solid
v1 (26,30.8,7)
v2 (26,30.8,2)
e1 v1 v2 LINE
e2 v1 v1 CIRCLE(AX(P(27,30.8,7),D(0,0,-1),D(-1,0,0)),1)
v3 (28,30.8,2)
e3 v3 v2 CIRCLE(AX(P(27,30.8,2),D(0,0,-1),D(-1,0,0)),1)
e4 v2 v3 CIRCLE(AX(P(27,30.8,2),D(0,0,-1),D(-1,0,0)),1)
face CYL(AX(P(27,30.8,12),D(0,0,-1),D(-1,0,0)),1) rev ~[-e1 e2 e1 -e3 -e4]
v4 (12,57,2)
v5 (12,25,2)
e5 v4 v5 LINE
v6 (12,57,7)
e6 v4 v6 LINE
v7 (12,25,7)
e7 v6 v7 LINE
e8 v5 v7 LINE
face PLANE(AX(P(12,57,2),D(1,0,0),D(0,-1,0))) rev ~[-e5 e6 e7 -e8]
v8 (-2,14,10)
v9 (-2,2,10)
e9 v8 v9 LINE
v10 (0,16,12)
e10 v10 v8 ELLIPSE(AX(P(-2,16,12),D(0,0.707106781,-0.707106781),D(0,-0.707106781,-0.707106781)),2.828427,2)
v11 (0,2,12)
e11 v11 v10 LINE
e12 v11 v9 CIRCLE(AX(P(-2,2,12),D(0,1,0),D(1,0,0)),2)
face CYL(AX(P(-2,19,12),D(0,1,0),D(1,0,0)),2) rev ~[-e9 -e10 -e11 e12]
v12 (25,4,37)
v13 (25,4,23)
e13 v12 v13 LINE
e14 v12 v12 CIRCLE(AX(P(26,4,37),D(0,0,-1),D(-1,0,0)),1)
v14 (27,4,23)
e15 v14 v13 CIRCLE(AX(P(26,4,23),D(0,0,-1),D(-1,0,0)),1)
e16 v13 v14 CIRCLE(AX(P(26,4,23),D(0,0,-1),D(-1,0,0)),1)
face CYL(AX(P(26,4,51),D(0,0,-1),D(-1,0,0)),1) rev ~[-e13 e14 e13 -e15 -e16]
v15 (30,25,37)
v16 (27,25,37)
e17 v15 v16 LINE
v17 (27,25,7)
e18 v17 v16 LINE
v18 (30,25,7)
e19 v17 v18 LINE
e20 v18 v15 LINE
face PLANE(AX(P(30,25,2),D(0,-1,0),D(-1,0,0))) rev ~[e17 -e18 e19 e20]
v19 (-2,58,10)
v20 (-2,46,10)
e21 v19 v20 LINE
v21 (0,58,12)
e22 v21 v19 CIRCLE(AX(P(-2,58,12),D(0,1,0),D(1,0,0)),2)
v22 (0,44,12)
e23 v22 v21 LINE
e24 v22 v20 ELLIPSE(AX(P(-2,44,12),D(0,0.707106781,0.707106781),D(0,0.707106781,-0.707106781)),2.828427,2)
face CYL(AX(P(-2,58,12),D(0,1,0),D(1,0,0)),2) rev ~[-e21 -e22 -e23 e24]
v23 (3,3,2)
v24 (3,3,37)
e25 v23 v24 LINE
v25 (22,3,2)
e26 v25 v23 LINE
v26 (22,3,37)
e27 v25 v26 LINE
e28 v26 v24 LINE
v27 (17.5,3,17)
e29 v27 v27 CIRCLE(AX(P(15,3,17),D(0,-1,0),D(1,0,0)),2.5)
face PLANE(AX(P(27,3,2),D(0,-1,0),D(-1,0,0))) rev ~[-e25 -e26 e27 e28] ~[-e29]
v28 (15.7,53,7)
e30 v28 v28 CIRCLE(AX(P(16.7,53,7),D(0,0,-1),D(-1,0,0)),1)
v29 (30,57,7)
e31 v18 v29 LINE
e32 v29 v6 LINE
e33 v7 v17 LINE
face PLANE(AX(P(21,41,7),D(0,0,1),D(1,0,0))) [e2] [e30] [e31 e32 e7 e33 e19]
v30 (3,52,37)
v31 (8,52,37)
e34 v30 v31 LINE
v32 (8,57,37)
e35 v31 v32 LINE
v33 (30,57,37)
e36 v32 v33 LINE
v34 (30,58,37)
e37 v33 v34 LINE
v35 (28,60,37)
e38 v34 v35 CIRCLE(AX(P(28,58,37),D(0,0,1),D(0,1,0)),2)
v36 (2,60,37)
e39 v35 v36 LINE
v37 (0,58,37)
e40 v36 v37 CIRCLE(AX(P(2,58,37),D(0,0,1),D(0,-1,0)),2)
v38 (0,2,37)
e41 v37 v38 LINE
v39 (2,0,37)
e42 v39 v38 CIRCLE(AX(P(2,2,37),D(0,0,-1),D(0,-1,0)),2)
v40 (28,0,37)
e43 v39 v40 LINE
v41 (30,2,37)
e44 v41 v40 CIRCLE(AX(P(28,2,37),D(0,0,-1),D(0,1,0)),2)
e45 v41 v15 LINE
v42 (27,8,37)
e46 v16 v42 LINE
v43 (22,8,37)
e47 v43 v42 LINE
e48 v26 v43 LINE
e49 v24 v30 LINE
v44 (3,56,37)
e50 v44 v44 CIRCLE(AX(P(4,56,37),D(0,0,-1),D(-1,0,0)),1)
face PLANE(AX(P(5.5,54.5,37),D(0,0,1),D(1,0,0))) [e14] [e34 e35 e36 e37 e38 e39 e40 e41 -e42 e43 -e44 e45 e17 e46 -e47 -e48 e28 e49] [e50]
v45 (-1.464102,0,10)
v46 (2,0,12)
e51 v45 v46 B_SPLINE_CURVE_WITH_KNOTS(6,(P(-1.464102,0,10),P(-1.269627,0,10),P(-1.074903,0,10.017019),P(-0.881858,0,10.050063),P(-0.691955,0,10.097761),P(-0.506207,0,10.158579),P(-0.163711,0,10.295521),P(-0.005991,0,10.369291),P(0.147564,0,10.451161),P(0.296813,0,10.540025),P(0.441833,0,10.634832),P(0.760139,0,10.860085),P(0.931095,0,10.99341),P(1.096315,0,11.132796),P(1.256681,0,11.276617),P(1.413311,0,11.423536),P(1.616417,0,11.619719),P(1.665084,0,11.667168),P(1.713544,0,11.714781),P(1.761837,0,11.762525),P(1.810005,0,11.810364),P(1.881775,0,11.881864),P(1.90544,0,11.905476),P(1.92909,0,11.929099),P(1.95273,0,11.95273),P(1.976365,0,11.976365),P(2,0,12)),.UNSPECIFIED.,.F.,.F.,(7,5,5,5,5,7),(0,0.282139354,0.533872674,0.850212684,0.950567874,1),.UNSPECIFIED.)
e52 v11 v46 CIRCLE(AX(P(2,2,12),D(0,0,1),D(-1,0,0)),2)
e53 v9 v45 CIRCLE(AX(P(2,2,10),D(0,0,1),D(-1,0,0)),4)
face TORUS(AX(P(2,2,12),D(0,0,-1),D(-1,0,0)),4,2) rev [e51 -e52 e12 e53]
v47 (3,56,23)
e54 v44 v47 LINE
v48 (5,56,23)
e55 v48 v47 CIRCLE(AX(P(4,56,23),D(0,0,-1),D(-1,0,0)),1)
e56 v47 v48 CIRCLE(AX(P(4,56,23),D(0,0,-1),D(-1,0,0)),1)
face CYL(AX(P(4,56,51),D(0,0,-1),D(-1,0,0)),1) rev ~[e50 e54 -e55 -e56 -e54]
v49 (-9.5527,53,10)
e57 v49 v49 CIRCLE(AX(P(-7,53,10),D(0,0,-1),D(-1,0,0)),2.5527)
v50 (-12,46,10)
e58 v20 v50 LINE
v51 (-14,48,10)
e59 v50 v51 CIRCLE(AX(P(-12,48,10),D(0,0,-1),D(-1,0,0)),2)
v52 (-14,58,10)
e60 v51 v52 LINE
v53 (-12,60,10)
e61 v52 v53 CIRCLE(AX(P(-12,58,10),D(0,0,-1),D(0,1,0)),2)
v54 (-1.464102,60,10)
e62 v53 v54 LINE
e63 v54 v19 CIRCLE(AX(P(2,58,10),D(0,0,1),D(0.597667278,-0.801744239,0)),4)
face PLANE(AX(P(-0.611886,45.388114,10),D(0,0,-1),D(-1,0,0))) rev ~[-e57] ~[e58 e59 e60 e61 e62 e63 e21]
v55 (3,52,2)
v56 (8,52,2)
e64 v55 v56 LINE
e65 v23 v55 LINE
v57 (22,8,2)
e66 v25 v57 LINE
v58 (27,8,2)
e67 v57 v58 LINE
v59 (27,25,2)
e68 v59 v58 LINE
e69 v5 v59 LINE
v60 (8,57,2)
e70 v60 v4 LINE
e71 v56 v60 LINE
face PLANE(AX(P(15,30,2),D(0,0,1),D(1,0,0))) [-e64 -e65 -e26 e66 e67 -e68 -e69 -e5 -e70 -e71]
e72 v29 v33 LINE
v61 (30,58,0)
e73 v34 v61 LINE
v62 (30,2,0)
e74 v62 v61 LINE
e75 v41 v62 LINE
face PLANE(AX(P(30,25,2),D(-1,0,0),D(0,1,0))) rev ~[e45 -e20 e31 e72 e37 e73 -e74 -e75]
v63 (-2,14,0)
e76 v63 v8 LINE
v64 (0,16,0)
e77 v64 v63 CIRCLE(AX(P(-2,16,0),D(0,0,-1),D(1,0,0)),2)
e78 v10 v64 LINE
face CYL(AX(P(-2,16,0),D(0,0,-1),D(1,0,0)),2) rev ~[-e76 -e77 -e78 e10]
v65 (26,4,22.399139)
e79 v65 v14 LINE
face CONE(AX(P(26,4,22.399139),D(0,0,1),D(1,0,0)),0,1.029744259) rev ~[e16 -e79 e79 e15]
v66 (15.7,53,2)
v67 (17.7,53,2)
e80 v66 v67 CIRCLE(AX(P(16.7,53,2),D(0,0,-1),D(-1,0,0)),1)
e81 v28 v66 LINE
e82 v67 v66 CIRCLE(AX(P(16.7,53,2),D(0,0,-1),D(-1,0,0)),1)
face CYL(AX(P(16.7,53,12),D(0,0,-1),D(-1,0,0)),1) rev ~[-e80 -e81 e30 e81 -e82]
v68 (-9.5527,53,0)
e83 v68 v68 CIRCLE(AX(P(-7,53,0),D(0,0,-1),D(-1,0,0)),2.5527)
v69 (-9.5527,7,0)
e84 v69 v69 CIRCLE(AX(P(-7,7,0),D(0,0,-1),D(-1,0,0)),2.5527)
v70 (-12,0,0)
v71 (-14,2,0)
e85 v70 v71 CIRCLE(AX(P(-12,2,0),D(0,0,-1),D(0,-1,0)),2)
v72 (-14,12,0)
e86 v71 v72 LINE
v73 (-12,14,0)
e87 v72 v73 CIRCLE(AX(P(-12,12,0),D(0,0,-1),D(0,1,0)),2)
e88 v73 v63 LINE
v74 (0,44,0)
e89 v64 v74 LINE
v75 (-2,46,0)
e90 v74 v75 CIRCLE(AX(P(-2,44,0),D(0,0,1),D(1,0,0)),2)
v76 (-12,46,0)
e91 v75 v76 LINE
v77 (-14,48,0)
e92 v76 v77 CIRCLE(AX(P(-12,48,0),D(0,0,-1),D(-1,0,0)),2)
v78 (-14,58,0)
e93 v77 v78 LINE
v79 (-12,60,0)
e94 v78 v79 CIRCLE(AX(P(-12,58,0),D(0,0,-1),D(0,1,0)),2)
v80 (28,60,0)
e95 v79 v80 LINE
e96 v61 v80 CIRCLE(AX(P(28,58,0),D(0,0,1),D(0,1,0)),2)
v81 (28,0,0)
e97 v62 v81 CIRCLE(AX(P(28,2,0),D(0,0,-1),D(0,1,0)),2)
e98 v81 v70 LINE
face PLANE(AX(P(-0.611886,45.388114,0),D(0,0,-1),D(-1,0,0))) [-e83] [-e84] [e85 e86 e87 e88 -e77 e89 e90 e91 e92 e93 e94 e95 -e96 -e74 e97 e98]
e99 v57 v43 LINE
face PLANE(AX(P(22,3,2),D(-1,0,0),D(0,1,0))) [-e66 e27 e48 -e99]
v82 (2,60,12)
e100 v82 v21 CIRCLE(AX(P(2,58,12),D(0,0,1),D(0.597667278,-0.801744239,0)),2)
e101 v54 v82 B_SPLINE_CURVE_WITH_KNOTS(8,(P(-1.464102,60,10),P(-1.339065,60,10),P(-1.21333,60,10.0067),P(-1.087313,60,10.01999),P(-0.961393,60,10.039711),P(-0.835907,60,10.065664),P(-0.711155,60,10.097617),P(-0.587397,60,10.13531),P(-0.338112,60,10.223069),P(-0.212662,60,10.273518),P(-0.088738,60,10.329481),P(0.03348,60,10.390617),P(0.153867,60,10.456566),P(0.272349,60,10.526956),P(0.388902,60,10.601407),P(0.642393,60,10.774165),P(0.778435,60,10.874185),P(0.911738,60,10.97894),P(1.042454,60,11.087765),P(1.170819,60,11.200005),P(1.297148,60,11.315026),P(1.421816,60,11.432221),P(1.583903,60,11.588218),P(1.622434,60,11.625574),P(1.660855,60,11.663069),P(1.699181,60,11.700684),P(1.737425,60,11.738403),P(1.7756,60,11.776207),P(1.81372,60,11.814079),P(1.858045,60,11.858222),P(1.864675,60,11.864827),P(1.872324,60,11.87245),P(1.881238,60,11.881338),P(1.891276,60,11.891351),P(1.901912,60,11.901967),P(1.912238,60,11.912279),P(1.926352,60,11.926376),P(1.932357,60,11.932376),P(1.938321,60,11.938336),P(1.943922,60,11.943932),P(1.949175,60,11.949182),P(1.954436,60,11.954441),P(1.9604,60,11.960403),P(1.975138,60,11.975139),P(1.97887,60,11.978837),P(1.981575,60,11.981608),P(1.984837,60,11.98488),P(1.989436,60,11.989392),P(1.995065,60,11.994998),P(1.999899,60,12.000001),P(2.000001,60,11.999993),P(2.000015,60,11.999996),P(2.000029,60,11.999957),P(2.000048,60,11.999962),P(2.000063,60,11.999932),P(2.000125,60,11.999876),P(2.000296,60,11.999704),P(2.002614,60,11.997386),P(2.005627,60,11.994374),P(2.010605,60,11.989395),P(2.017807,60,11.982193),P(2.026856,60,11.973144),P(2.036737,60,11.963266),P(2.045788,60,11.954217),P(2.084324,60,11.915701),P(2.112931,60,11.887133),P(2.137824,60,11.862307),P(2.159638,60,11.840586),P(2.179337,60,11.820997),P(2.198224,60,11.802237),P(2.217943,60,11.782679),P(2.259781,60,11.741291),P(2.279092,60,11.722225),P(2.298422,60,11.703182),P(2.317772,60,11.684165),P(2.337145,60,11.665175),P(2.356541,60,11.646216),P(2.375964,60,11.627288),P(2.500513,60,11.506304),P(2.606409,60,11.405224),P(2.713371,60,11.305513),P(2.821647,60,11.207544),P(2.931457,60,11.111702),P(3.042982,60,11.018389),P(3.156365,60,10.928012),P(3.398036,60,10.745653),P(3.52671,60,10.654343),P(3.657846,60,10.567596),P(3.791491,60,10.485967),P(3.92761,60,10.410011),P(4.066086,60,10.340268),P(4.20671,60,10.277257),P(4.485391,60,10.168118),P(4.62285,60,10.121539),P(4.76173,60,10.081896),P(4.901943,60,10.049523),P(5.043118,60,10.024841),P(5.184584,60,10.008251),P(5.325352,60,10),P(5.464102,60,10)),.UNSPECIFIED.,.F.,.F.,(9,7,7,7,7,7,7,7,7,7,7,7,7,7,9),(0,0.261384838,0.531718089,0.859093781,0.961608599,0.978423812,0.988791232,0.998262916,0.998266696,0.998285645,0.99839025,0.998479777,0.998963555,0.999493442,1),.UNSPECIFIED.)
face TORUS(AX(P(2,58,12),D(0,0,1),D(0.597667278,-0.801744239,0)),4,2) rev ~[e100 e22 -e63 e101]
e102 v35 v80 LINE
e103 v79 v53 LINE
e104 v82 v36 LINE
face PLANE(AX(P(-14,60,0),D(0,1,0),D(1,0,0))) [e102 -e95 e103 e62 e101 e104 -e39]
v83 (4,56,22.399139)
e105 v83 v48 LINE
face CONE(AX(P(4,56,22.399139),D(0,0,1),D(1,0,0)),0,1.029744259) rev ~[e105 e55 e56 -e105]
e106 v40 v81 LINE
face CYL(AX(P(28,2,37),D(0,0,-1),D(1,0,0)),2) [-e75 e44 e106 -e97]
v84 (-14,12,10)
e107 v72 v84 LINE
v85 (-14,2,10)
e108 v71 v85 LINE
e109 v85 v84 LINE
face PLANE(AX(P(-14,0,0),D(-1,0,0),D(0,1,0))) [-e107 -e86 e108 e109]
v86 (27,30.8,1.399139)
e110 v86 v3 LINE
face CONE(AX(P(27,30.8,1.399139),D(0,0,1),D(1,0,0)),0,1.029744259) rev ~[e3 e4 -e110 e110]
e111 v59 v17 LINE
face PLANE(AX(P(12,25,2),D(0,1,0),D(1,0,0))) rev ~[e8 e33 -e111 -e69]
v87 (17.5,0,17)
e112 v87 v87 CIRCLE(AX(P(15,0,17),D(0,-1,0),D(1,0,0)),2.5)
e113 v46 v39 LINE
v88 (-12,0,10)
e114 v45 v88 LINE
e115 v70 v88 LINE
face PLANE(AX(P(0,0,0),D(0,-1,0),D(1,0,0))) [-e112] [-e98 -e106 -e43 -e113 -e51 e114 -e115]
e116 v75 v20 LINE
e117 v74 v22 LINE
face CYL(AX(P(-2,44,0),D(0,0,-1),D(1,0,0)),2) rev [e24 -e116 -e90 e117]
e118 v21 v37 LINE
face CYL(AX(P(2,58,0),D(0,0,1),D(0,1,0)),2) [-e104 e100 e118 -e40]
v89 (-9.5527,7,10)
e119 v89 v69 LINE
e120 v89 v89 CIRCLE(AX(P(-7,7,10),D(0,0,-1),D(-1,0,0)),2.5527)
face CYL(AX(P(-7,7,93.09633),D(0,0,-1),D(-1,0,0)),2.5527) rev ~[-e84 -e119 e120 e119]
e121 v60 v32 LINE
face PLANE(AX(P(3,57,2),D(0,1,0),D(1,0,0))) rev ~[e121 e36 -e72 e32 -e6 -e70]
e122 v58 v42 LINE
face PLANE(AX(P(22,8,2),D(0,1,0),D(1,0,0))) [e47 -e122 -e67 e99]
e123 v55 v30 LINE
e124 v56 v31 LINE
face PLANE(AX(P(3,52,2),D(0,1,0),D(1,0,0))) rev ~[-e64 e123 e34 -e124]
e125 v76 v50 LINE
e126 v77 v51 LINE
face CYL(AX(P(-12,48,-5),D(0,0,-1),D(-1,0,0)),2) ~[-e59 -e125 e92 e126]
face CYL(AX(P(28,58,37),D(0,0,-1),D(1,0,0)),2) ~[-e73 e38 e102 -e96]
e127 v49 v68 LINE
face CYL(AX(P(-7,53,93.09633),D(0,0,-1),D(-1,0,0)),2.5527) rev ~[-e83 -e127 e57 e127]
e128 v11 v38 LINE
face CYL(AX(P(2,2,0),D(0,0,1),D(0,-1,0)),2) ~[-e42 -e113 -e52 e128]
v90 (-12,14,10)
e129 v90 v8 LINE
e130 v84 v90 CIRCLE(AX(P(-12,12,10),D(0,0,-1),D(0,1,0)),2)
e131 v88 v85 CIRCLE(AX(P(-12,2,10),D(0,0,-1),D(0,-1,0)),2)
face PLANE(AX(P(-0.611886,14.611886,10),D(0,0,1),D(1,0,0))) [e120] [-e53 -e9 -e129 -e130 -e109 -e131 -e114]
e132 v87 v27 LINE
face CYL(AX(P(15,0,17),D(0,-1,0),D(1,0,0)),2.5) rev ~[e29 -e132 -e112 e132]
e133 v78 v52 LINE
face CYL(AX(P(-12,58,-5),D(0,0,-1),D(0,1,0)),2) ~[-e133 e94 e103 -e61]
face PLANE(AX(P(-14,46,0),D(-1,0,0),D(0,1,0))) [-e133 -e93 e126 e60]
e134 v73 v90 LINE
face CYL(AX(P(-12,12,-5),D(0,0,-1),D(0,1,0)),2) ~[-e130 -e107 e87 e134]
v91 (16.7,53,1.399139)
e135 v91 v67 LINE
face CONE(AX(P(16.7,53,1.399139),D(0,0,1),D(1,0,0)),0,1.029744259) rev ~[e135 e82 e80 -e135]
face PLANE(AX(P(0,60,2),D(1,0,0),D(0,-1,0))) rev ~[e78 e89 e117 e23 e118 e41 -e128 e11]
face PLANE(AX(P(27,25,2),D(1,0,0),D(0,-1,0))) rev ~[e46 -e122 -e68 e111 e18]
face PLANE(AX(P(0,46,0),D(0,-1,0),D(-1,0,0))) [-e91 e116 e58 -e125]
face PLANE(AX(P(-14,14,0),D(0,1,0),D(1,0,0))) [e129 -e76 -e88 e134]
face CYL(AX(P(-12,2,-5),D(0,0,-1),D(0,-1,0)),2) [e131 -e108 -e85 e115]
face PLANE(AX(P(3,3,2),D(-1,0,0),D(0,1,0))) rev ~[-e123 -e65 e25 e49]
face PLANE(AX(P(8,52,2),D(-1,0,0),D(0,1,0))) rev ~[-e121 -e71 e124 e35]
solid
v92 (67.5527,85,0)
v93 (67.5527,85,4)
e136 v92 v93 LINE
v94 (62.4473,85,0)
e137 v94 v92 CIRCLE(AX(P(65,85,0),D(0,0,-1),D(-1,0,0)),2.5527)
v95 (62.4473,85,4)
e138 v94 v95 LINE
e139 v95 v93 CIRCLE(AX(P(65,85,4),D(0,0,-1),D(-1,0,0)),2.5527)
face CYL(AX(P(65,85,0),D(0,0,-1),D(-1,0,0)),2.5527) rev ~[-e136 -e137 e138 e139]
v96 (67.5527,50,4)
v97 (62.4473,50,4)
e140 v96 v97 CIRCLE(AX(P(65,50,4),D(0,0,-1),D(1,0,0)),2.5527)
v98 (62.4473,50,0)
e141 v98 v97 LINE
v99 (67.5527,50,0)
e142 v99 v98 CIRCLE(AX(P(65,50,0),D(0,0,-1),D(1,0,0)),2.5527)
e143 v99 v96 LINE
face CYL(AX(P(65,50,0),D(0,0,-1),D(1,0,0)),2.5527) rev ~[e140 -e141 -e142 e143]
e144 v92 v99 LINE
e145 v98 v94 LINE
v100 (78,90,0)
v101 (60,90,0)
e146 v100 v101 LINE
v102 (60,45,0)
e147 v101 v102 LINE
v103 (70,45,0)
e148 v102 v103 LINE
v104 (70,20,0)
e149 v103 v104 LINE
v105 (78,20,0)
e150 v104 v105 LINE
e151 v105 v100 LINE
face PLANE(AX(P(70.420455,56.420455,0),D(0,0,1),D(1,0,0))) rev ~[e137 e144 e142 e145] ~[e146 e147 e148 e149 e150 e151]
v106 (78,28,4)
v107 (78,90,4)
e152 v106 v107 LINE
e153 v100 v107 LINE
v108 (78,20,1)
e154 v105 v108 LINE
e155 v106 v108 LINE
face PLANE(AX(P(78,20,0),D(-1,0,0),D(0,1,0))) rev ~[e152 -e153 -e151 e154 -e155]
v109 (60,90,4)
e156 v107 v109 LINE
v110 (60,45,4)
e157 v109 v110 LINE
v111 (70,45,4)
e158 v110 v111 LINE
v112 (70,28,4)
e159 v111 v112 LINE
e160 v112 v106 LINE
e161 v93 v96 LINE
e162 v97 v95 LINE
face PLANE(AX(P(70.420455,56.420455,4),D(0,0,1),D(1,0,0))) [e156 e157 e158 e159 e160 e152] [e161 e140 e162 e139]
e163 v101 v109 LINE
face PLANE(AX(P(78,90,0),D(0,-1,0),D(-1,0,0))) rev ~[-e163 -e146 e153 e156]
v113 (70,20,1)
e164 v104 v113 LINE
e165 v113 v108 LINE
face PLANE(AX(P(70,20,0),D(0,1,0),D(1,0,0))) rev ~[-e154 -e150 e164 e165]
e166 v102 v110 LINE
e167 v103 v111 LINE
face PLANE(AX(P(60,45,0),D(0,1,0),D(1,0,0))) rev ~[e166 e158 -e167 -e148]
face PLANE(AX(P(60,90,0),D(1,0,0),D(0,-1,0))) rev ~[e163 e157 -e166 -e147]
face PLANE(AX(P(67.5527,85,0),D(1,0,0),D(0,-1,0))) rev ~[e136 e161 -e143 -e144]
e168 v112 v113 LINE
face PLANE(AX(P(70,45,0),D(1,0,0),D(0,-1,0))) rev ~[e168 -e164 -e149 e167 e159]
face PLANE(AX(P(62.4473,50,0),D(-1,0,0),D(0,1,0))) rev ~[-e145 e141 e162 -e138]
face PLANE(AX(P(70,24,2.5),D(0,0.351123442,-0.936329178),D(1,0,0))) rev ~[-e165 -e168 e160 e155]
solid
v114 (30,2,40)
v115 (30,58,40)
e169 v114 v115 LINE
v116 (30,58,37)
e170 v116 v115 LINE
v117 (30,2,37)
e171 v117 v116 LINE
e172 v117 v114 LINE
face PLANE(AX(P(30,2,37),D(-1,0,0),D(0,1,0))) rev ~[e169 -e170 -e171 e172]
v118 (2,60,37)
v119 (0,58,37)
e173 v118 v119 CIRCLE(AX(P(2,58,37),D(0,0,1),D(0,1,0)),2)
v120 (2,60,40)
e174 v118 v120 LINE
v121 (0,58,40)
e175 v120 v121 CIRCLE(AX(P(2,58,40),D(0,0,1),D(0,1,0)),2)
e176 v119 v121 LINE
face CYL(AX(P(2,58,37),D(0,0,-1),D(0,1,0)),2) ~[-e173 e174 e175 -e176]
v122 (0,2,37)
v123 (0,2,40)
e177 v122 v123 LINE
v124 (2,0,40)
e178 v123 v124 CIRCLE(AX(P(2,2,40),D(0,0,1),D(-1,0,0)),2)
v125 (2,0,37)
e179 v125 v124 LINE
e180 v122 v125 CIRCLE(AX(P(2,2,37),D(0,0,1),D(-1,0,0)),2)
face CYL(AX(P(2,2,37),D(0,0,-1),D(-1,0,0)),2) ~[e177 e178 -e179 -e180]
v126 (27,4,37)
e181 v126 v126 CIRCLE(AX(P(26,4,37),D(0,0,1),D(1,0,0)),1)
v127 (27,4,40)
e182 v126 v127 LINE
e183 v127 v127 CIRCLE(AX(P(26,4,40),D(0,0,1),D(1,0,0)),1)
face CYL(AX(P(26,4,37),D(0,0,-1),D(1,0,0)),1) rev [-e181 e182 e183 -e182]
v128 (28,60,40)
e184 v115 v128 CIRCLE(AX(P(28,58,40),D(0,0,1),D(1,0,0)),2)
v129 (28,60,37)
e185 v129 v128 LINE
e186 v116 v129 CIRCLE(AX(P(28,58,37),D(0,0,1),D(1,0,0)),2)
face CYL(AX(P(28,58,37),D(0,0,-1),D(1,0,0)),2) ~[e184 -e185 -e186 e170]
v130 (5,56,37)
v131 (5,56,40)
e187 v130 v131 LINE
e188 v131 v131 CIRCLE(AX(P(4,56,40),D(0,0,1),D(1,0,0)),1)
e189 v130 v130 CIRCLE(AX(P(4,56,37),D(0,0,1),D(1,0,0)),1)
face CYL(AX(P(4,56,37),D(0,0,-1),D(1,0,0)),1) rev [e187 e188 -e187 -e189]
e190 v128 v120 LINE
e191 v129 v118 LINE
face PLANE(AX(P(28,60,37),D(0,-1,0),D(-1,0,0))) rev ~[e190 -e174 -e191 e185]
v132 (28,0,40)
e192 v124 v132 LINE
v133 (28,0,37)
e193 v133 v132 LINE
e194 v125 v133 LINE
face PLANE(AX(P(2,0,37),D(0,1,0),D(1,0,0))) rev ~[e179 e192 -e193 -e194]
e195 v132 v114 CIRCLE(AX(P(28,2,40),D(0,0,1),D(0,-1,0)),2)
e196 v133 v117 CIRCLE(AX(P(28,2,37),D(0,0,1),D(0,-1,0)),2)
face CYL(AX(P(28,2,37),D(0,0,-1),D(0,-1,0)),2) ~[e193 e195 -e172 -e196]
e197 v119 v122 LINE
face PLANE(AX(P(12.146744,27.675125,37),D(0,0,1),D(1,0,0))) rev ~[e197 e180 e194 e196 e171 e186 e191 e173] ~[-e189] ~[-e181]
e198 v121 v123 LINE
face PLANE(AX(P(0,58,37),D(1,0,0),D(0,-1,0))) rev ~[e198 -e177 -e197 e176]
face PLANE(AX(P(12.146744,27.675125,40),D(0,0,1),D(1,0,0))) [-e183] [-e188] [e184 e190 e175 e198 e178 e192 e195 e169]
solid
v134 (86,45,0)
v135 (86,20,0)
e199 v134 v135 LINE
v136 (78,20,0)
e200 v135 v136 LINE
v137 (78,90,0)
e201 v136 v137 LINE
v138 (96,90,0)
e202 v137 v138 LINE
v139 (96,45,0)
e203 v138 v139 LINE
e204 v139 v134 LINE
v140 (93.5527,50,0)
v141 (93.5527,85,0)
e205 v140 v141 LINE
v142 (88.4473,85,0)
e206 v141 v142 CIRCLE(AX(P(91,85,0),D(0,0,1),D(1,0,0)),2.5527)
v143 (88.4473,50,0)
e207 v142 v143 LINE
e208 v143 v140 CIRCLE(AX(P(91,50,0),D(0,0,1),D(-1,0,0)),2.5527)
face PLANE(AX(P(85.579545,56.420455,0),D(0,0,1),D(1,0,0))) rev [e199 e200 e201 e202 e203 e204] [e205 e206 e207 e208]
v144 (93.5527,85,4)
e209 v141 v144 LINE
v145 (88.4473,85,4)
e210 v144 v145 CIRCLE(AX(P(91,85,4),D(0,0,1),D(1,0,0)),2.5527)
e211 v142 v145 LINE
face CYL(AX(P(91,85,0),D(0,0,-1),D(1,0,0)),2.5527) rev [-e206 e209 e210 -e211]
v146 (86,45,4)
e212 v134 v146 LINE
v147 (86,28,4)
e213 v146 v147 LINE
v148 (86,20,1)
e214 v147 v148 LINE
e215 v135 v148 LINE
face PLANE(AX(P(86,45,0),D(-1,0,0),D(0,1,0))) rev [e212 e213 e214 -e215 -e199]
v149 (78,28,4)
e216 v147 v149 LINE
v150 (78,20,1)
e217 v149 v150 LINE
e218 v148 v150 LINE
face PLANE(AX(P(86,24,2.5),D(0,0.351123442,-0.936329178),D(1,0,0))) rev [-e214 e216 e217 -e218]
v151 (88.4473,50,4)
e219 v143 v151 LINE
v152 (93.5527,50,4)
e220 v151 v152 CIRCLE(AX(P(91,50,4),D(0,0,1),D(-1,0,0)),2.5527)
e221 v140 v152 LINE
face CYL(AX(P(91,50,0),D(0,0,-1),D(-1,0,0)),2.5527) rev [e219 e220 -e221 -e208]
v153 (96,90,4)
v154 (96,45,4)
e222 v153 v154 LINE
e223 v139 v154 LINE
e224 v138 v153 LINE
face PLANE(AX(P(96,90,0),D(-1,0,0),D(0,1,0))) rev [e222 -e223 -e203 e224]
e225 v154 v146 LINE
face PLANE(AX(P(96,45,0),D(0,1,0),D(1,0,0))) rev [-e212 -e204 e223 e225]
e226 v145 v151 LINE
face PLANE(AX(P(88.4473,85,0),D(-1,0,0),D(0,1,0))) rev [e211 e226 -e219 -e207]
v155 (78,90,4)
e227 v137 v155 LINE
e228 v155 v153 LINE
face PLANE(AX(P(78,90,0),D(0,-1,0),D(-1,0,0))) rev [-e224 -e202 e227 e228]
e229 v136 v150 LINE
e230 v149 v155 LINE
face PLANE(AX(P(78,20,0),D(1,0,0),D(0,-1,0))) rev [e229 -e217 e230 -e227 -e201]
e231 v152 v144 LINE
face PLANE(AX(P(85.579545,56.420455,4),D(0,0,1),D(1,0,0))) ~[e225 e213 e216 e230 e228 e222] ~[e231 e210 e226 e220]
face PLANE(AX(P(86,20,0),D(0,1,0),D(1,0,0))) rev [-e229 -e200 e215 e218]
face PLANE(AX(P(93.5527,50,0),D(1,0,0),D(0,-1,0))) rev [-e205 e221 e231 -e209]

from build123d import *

# Parameters (mm, degrees)
F0_W          = 30
F0_H          = 60
F1_DEPTH      = 2
F3_DEPTH      = 35
F4_DEPTH      = 5
F6_D          = 2
F6_DEPTH      = 5
F6_TIP        = 0.600860619
F7_R          = 2
F8_W          = 5
F8_H          = 5
F9_DEPTH      = 35
F11_D         = 2
F11_DEPTH     = 14
F11_TIP       = 0.600860619
F12_R         = 2.5
F13_DEPTH     = 3
F15_DEPTH     = 10
F17_D         = 5.1054
F18_T1_DEPTH  = 10
F18_T3_DEPTH  = 12
F18_T5_DEPTH  = 12
F18_T10_ANGLE = 233.2969892374
F18_T15_ANGLE = 233.2969892374
F18_T22_DEPTH = 17
F18_T26_DEPTH = 15
F18_T33_DEPTH = 15
F18_T37_DEPTH = 17
F18_T40_DEPTH = 20
F19_R         = 1
F20_DEPTH     = 3
F22_DEPTH     = 4
F23_SIZE2     = 3
F23_SIZE      = 8


# Not quite as in the source:
# - a fillet or chamfer that OpenCascade refuses, or shapes differently, is made with other operations: its cross-section is extruded or revolved along the edge and cut away or added


with BuildPart() as f1:
    # F0 (on Top) → F1 (new body)
    with BuildSketch(Plane.XY):
        with Locations((15, 30)):
            Rectangle(F0_W, F0_H)
    extrude(amount=F1_DEPTH)

    # F2 (on face) → F3 (join)
    with BuildSketch(Plane.XY.offset(2)):
        Polygon((30, 60), (0, 60), (0, 0), (30, 0), (30, 25), (27, 25), (27, 3), (3, 3), (3, 57), (12, 57), (30, 57), align=None)
    extrude(amount=F3_DEPTH)

    # F2 (on face) → F4 (join)
    with BuildSketch(Plane.XY.offset(2)):
        Polygon((30, 25), (30, 57), (12, 57), (12, 25), (27, 25), align=None)
    extrude(amount=F4_DEPTH)

    # F6
    with Locations(Plane.XY.offset(7)):
        with Locations((16.7, 53), (27, 30.8)):
            Hole(F6_D / 2, depth=F6_DEPTH)
            with Locations((0, 0, -(F6_DEPTH + F6_TIP / 2))):  # 118° drill point
                Cone(0, F6_D / 2, F6_TIP, mode=Mode.SUBTRACT)

    # F7
    f7_edges = [f1.edges().sort_by_distance(p)[0] for p in [
        (30, 0, 18.5),
        (0, 0, 18.5),
        (0, 60, 18.5),
        (30, 60, 18.5),
    ]]
    fillet(f7_edges, radius=F7_R)

    # F8 (on face) → F9 (join, through all)
    with BuildSketch(Plane.XY.offset(2)):
        with Locations((5.5, 54.5)):
            Rectangle(F8_W, F8_H)
        with Locations((24.5, 5.5)):
            Rectangle(F8_W, F8_H)
    extrude(amount=F9_DEPTH)

    # F11
    with Locations(Plane.XY.offset(37)):
        with Locations((4, 56), (26, 4)):
            Hole(F11_D / 2, depth=F11_DEPTH)
            with Locations((0, 0, -(F11_DEPTH + F11_TIP / 2))):  # 118° drill point
                Cone(0, F11_D / 2, F11_TIP, mode=Mode.SUBTRACT)

    # F12 (on face) → F13 (cut, through all)
    with BuildSketch(Plane.XZ):
        with Locations((15, 17)):
            Circle(F12_R)
    extrude(amount=-F13_DEPTH, mode=Mode.SUBTRACT)

    # F14 (on face) → F15 (join)
    with BuildSketch(Plane(origin=(0, 0, 0), x_dir=(1, 0, 0), z_dir=(0, 0, -1))):
        with BuildLine():
            Line((0, -58), (0, -46))
            Line((0, -46), (-14, -46))
            Line((-14, -46), (-14, -60))
            Line((-14, -60), (2, -60))
            ThreePointArc((2, -60), (0.5857864376, -59.4142135624), (0, -58))
        make_face()
        with BuildLine():
            ThreePointArc((0, -2), (0.5857864376, -0.5857864376), (2, 0))
            Line((2, 0), (-14, 0))
            Line((-14, 0), (-14, -14))
            Line((-14, -14), (0, -14))
            Line((0, -14), (0, -2))
        make_face()
    extrude(amount=-F15_DEPTH)

    # F17 (through all)
    with Locations(Plane.XY.offset(10)):
        with Locations((-7, 53), (-7, 7)):
            Hole(F17_D / 2)

    # F18: fillet of radius 2 on 8 edges, made by hand

    # F18_s2 → F18_t1 (join)
    with BuildSketch(Plane.XY):
        with BuildLine():
            ThreePointArc((0, 44), (-0.5857864376, 45.4142135624), (-2, 46))
            Line((-2, 46), (0, 46))
            Line((0, 46), (0, 44))
        make_face()
        with BuildLine():
            ThreePointArc((0, 16), (-0.5857864376, 14.5857864376), (-2, 14))
            Line((-2, 14), (0, 14))
            Line((0, 14), (0, 16))
        make_face()
    extrude(amount=F18_T1_DEPTH)

    # F18_s4 → F18_t3 (join)
    with BuildSketch(Plane.XZ.offset(-14)):
        with BuildLine():
            ThreePointArc((0, 12), (-0.5857864376, 10.5857864376), (-2, 10))
            Line((-2, 10), (0, 10))
            Line((0, 10), (0, 12))
        make_face()
    extrude(amount=F18_T3_DEPTH)

    # F18_s6 → F18_t5 (join)
    with BuildSketch(Plane.XZ.offset(-58)):
        with BuildLine():
            ThreePointArc((0, 12), (-0.5857864376, 10.5857864376), (-2, 10))
            Line((-2, 10), (0, 10))
            Line((0, 10), (0, 12))
        make_face()
    extrude(amount=F18_T5_DEPTH)


with BuildPart() as f18_tool8:
    # F18_s9 → F18_t10 (revolve)
    with BuildSketch(Plane(origin=(29.0778128683, 21.6763107294, 0), x_dir=(0, 0, 1), z_dir=(-0.8017442393, -0.5976672776, 0))):
        with BuildLine():
            ThreePointArc((12, 43.305831324), (10.5857864376, 42.7200448864), (10, 41.305831324))
            Line((10, 41.305831324), (10, 43.305831324))
            Line((10, 43.305831324), (12, 43.305831324))
        make_face()
    revolve(axis=Axis((2, 58, 10), (0, 0, 1)), revolution_arc=F18_T10_ANGLE)

    split(bisect_by=Plane.XZ.offset(-60), keep=Keep.TOP)


with BuildPart() as f1_1:
    add(f1.part)

    # F18_t7: union F18_tool8
    add(f18_tool8.part)


with BuildPart() as f18_tool13:
    # F18_s14 → F18_t15 (revolve)
    with BuildSketch(Plane.XZ.offset(-2)):
        with BuildLine():
            ThreePointArc((-2, 10), (-0.5857864376, 10.5857864376), (0, 12))
            Line((0, 12), (0, 10))
            Line((0, 10), (-2, 10))
        make_face()
    revolve(axis=Axis((2, 2, 10), (0, 0, 1)), revolution_arc=F18_T15_ANGLE)

    split(bisect_by=Plane.XZ, keep=Keep.BOTTOM)

    split(bisect_by=Plane.XZ.offset(-3), keep=Keep.TOP)


with BuildPart() as f1_2:
    add(f1_1.part)

    # F18_t12: union F18_tool13
    add(f18_tool13.part)


with BuildPart() as f18_tool20:
    # F18_s21 → F18_t22 (new body)
    with BuildSketch(Plane.XZ.offset(-58)):
        with BuildLine():
            ThreePointArc((0, 12), (-0.5857864376, 10.5857864376), (-2, 10))
            Line((-2, 10), (0, 10))
            Line((0, 10), (0, 12))
        make_face()
    extrude(amount=F18_T22_DEPTH)

    split(bisect_by=Plane.XZ.offset(-46), keep=Keep.TOP)


with BuildPart() as f18_tool24:
    # F18_s25 → F18_t26 (new body)
    with BuildSketch(Plane.XY):
        with BuildLine():
            ThreePointArc((0, 44), (-0.5857864376, 45.4142135624), (-2, 46))
            Line((-2, 46), (0, 46))
            Line((0, 46), (0, 44))
        make_face()
    extrude(amount=F18_T26_DEPTH)

    split(bisect_by=Plane.XY.offset(10), keep=Keep.TOP)


with BuildPart() as f18_tool20_1:
    add(f18_tool20.part)

    # F18_t28: intersect F18_tool24
    add(f18_tool24.part, mode=Mode.INTERSECT)


with BuildPart() as f1_3:
    add(f1_2.part)

    # F18_t18: union F18_tool20
    add(f18_tool20_1.part)


with BuildPart() as f18_tool31:
    # F18_s32 → F18_t33 (new body)
    with BuildSketch(Plane.XY):
        with BuildLine():
            ThreePointArc((0, 16), (-0.5857864376, 14.5857864376), (-2, 14))
            Line((-2, 14), (0, 14))
            Line((0, 14), (0, 16))
        make_face()
    extrude(amount=F18_T33_DEPTH)

    split(bisect_by=Plane.XY.offset(10), keep=Keep.TOP)


with BuildPart() as f18_tool35:
    # F18_s36 → F18_t37 (new body)
    with BuildSketch(Plane.XZ.offset(-19)):
        with BuildLine():
            ThreePointArc((0, 12), (-0.5857864376, 10.5857864376), (-2, 10))
            Line((-2, 10), (0, 10))
            Line((0, 10), (0, 12))
        make_face()
    extrude(amount=F18_T37_DEPTH)

    split(bisect_by=Plane.XZ.offset(-14), keep=Keep.BOTTOM)


with BuildPart() as f18_tool31_1:
    add(f18_tool31.part)

    # F18_t39: intersect F18_tool35
    add(f18_tool35.part, mode=Mode.INTERSECT)


with BuildPart() as f1_4:
    add(f1_3.part)

    # F18_t29: union F18_tool31
    add(f18_tool31_1.part)

    # F18_s41 → F18_t40 (cut)
    with BuildSketch(Plane.XY.offset(-5)):
        with BuildLine():
            ThreePointArc((-14, 48), (-13.4142135624, 46.5857864376), (-12, 46))
            Line((-12, 46), (-14, 46))
            Line((-14, 46), (-14, 48))
        make_face()
        with BuildLine():
            ThreePointArc((-12, 60), (-13.4142135624, 59.4142135624), (-14, 58))
            Line((-14, 58), (-14, 60))
            Line((-14, 60), (-12, 60))
        make_face()
        with BuildLine():
            ThreePointArc((-12, 0), (-13.4142135624, 0.5857864376), (-14, 2))
            Line((-14, 2), (-14, 0))
            Line((-14, 0), (-12, 0))
        make_face()
        with BuildLine():
            ThreePointArc((-12, 14), (-13.4142135624, 13.4142135624), (-14, 12))
            Line((-14, 12), (-14, 14))
            Line((-14, 14), (-12, 14))
        make_face()
    extrude(amount=F18_T40_DEPTH, mode=Mode.SUBTRACT)


with BuildPart() as f20:
    # F19 (on face) → F20 (new body)
    with BuildSketch(Plane.XY.offset(37)):
        with BuildLine():
            Line((30, 2), (30, 25))
            Line((30, 25), (27, 25))
            Line((27, 25), (27, 8))
            Line((27, 8), (22, 8))
            Line((22, 8), (22, 3))
            Line((22, 3), (3, 3))
            Line((3, 3), (3, 52))
            Line((3, 52), (8, 52))
            Line((8, 52), (8, 57))
            Line((8, 57), (30, 57))
            Line((30, 57), (30, 58))
            ThreePointArc((30, 58), (29.4142135624, 59.4142135624), (28, 60))
            Line((28, 60), (2, 60))
            ThreePointArc((2, 60), (0.5857864376, 59.4142135624), (0, 58))
            Line((0, 58), (0, 2))
            ThreePointArc((0, 2), (0.5857864376, 0.5857864376), (2, 0))
            Line((2, 0), (28, 0))
            ThreePointArc((28, 0), (29.4142135624, 0.5857864376), (30, 2))
        make_face()
        with Locations((26, 4)):
            Circle(F19_R, mode=Mode.SUBTRACT)
        with Locations((4, 56)):
            Circle(F19_R, mode=Mode.SUBTRACT)
        Polygon((27, 25), (30, 25), (30, 57), (8, 57), (8, 52), (3, 52), (3, 3), (22, 3), (22, 8), (27, 8), align=None)
    extrude(amount=F20_DEPTH)


with BuildPart() as f22:
    # F21 (on Top) → F22 (new body)
    with BuildSketch(Plane.XY):
        Polygon((70, 45), (70, 20), (78, 20), (78, 90), (60, 90), (60, 45), align=None)
        with BuildLine():
            ThreePointArc((62.4473, 85), (65, 87.5527), (67.5527, 85))
            Line((67.5527, 85), (67.5527, 50))
            ThreePointArc((67.5527, 50), (65, 47.4473), (62.4473, 50))
            Line((62.4473, 50), (62.4473, 85))
        make_face(mode=Mode.SUBTRACT)
    extrude(amount=F22_DEPTH)

    # F23
    f23_edges = [f22.edges().sort_by_distance(p)[0] for p in [
        (74, 20, 4),
    ]]
    f23_side = f22.faces().sort_by_distance((71.21578, 58.866972, 4))[0]
    chamfer(f23_edges, length=F23_SIZE, length2=F23_SIZE2, reference=f23_side)


with BuildPart() as f24_1:
    # F24: instance of F22
    add(f22.part.mirror(Plane(origin=(78, 56.447761194, 1.9552238806), x_dir=(0, 1, 0), z_dir=(1, 0, 0))))


solid = Compound([f1_4.part, f20.part, f22.part, f24_1.part])
